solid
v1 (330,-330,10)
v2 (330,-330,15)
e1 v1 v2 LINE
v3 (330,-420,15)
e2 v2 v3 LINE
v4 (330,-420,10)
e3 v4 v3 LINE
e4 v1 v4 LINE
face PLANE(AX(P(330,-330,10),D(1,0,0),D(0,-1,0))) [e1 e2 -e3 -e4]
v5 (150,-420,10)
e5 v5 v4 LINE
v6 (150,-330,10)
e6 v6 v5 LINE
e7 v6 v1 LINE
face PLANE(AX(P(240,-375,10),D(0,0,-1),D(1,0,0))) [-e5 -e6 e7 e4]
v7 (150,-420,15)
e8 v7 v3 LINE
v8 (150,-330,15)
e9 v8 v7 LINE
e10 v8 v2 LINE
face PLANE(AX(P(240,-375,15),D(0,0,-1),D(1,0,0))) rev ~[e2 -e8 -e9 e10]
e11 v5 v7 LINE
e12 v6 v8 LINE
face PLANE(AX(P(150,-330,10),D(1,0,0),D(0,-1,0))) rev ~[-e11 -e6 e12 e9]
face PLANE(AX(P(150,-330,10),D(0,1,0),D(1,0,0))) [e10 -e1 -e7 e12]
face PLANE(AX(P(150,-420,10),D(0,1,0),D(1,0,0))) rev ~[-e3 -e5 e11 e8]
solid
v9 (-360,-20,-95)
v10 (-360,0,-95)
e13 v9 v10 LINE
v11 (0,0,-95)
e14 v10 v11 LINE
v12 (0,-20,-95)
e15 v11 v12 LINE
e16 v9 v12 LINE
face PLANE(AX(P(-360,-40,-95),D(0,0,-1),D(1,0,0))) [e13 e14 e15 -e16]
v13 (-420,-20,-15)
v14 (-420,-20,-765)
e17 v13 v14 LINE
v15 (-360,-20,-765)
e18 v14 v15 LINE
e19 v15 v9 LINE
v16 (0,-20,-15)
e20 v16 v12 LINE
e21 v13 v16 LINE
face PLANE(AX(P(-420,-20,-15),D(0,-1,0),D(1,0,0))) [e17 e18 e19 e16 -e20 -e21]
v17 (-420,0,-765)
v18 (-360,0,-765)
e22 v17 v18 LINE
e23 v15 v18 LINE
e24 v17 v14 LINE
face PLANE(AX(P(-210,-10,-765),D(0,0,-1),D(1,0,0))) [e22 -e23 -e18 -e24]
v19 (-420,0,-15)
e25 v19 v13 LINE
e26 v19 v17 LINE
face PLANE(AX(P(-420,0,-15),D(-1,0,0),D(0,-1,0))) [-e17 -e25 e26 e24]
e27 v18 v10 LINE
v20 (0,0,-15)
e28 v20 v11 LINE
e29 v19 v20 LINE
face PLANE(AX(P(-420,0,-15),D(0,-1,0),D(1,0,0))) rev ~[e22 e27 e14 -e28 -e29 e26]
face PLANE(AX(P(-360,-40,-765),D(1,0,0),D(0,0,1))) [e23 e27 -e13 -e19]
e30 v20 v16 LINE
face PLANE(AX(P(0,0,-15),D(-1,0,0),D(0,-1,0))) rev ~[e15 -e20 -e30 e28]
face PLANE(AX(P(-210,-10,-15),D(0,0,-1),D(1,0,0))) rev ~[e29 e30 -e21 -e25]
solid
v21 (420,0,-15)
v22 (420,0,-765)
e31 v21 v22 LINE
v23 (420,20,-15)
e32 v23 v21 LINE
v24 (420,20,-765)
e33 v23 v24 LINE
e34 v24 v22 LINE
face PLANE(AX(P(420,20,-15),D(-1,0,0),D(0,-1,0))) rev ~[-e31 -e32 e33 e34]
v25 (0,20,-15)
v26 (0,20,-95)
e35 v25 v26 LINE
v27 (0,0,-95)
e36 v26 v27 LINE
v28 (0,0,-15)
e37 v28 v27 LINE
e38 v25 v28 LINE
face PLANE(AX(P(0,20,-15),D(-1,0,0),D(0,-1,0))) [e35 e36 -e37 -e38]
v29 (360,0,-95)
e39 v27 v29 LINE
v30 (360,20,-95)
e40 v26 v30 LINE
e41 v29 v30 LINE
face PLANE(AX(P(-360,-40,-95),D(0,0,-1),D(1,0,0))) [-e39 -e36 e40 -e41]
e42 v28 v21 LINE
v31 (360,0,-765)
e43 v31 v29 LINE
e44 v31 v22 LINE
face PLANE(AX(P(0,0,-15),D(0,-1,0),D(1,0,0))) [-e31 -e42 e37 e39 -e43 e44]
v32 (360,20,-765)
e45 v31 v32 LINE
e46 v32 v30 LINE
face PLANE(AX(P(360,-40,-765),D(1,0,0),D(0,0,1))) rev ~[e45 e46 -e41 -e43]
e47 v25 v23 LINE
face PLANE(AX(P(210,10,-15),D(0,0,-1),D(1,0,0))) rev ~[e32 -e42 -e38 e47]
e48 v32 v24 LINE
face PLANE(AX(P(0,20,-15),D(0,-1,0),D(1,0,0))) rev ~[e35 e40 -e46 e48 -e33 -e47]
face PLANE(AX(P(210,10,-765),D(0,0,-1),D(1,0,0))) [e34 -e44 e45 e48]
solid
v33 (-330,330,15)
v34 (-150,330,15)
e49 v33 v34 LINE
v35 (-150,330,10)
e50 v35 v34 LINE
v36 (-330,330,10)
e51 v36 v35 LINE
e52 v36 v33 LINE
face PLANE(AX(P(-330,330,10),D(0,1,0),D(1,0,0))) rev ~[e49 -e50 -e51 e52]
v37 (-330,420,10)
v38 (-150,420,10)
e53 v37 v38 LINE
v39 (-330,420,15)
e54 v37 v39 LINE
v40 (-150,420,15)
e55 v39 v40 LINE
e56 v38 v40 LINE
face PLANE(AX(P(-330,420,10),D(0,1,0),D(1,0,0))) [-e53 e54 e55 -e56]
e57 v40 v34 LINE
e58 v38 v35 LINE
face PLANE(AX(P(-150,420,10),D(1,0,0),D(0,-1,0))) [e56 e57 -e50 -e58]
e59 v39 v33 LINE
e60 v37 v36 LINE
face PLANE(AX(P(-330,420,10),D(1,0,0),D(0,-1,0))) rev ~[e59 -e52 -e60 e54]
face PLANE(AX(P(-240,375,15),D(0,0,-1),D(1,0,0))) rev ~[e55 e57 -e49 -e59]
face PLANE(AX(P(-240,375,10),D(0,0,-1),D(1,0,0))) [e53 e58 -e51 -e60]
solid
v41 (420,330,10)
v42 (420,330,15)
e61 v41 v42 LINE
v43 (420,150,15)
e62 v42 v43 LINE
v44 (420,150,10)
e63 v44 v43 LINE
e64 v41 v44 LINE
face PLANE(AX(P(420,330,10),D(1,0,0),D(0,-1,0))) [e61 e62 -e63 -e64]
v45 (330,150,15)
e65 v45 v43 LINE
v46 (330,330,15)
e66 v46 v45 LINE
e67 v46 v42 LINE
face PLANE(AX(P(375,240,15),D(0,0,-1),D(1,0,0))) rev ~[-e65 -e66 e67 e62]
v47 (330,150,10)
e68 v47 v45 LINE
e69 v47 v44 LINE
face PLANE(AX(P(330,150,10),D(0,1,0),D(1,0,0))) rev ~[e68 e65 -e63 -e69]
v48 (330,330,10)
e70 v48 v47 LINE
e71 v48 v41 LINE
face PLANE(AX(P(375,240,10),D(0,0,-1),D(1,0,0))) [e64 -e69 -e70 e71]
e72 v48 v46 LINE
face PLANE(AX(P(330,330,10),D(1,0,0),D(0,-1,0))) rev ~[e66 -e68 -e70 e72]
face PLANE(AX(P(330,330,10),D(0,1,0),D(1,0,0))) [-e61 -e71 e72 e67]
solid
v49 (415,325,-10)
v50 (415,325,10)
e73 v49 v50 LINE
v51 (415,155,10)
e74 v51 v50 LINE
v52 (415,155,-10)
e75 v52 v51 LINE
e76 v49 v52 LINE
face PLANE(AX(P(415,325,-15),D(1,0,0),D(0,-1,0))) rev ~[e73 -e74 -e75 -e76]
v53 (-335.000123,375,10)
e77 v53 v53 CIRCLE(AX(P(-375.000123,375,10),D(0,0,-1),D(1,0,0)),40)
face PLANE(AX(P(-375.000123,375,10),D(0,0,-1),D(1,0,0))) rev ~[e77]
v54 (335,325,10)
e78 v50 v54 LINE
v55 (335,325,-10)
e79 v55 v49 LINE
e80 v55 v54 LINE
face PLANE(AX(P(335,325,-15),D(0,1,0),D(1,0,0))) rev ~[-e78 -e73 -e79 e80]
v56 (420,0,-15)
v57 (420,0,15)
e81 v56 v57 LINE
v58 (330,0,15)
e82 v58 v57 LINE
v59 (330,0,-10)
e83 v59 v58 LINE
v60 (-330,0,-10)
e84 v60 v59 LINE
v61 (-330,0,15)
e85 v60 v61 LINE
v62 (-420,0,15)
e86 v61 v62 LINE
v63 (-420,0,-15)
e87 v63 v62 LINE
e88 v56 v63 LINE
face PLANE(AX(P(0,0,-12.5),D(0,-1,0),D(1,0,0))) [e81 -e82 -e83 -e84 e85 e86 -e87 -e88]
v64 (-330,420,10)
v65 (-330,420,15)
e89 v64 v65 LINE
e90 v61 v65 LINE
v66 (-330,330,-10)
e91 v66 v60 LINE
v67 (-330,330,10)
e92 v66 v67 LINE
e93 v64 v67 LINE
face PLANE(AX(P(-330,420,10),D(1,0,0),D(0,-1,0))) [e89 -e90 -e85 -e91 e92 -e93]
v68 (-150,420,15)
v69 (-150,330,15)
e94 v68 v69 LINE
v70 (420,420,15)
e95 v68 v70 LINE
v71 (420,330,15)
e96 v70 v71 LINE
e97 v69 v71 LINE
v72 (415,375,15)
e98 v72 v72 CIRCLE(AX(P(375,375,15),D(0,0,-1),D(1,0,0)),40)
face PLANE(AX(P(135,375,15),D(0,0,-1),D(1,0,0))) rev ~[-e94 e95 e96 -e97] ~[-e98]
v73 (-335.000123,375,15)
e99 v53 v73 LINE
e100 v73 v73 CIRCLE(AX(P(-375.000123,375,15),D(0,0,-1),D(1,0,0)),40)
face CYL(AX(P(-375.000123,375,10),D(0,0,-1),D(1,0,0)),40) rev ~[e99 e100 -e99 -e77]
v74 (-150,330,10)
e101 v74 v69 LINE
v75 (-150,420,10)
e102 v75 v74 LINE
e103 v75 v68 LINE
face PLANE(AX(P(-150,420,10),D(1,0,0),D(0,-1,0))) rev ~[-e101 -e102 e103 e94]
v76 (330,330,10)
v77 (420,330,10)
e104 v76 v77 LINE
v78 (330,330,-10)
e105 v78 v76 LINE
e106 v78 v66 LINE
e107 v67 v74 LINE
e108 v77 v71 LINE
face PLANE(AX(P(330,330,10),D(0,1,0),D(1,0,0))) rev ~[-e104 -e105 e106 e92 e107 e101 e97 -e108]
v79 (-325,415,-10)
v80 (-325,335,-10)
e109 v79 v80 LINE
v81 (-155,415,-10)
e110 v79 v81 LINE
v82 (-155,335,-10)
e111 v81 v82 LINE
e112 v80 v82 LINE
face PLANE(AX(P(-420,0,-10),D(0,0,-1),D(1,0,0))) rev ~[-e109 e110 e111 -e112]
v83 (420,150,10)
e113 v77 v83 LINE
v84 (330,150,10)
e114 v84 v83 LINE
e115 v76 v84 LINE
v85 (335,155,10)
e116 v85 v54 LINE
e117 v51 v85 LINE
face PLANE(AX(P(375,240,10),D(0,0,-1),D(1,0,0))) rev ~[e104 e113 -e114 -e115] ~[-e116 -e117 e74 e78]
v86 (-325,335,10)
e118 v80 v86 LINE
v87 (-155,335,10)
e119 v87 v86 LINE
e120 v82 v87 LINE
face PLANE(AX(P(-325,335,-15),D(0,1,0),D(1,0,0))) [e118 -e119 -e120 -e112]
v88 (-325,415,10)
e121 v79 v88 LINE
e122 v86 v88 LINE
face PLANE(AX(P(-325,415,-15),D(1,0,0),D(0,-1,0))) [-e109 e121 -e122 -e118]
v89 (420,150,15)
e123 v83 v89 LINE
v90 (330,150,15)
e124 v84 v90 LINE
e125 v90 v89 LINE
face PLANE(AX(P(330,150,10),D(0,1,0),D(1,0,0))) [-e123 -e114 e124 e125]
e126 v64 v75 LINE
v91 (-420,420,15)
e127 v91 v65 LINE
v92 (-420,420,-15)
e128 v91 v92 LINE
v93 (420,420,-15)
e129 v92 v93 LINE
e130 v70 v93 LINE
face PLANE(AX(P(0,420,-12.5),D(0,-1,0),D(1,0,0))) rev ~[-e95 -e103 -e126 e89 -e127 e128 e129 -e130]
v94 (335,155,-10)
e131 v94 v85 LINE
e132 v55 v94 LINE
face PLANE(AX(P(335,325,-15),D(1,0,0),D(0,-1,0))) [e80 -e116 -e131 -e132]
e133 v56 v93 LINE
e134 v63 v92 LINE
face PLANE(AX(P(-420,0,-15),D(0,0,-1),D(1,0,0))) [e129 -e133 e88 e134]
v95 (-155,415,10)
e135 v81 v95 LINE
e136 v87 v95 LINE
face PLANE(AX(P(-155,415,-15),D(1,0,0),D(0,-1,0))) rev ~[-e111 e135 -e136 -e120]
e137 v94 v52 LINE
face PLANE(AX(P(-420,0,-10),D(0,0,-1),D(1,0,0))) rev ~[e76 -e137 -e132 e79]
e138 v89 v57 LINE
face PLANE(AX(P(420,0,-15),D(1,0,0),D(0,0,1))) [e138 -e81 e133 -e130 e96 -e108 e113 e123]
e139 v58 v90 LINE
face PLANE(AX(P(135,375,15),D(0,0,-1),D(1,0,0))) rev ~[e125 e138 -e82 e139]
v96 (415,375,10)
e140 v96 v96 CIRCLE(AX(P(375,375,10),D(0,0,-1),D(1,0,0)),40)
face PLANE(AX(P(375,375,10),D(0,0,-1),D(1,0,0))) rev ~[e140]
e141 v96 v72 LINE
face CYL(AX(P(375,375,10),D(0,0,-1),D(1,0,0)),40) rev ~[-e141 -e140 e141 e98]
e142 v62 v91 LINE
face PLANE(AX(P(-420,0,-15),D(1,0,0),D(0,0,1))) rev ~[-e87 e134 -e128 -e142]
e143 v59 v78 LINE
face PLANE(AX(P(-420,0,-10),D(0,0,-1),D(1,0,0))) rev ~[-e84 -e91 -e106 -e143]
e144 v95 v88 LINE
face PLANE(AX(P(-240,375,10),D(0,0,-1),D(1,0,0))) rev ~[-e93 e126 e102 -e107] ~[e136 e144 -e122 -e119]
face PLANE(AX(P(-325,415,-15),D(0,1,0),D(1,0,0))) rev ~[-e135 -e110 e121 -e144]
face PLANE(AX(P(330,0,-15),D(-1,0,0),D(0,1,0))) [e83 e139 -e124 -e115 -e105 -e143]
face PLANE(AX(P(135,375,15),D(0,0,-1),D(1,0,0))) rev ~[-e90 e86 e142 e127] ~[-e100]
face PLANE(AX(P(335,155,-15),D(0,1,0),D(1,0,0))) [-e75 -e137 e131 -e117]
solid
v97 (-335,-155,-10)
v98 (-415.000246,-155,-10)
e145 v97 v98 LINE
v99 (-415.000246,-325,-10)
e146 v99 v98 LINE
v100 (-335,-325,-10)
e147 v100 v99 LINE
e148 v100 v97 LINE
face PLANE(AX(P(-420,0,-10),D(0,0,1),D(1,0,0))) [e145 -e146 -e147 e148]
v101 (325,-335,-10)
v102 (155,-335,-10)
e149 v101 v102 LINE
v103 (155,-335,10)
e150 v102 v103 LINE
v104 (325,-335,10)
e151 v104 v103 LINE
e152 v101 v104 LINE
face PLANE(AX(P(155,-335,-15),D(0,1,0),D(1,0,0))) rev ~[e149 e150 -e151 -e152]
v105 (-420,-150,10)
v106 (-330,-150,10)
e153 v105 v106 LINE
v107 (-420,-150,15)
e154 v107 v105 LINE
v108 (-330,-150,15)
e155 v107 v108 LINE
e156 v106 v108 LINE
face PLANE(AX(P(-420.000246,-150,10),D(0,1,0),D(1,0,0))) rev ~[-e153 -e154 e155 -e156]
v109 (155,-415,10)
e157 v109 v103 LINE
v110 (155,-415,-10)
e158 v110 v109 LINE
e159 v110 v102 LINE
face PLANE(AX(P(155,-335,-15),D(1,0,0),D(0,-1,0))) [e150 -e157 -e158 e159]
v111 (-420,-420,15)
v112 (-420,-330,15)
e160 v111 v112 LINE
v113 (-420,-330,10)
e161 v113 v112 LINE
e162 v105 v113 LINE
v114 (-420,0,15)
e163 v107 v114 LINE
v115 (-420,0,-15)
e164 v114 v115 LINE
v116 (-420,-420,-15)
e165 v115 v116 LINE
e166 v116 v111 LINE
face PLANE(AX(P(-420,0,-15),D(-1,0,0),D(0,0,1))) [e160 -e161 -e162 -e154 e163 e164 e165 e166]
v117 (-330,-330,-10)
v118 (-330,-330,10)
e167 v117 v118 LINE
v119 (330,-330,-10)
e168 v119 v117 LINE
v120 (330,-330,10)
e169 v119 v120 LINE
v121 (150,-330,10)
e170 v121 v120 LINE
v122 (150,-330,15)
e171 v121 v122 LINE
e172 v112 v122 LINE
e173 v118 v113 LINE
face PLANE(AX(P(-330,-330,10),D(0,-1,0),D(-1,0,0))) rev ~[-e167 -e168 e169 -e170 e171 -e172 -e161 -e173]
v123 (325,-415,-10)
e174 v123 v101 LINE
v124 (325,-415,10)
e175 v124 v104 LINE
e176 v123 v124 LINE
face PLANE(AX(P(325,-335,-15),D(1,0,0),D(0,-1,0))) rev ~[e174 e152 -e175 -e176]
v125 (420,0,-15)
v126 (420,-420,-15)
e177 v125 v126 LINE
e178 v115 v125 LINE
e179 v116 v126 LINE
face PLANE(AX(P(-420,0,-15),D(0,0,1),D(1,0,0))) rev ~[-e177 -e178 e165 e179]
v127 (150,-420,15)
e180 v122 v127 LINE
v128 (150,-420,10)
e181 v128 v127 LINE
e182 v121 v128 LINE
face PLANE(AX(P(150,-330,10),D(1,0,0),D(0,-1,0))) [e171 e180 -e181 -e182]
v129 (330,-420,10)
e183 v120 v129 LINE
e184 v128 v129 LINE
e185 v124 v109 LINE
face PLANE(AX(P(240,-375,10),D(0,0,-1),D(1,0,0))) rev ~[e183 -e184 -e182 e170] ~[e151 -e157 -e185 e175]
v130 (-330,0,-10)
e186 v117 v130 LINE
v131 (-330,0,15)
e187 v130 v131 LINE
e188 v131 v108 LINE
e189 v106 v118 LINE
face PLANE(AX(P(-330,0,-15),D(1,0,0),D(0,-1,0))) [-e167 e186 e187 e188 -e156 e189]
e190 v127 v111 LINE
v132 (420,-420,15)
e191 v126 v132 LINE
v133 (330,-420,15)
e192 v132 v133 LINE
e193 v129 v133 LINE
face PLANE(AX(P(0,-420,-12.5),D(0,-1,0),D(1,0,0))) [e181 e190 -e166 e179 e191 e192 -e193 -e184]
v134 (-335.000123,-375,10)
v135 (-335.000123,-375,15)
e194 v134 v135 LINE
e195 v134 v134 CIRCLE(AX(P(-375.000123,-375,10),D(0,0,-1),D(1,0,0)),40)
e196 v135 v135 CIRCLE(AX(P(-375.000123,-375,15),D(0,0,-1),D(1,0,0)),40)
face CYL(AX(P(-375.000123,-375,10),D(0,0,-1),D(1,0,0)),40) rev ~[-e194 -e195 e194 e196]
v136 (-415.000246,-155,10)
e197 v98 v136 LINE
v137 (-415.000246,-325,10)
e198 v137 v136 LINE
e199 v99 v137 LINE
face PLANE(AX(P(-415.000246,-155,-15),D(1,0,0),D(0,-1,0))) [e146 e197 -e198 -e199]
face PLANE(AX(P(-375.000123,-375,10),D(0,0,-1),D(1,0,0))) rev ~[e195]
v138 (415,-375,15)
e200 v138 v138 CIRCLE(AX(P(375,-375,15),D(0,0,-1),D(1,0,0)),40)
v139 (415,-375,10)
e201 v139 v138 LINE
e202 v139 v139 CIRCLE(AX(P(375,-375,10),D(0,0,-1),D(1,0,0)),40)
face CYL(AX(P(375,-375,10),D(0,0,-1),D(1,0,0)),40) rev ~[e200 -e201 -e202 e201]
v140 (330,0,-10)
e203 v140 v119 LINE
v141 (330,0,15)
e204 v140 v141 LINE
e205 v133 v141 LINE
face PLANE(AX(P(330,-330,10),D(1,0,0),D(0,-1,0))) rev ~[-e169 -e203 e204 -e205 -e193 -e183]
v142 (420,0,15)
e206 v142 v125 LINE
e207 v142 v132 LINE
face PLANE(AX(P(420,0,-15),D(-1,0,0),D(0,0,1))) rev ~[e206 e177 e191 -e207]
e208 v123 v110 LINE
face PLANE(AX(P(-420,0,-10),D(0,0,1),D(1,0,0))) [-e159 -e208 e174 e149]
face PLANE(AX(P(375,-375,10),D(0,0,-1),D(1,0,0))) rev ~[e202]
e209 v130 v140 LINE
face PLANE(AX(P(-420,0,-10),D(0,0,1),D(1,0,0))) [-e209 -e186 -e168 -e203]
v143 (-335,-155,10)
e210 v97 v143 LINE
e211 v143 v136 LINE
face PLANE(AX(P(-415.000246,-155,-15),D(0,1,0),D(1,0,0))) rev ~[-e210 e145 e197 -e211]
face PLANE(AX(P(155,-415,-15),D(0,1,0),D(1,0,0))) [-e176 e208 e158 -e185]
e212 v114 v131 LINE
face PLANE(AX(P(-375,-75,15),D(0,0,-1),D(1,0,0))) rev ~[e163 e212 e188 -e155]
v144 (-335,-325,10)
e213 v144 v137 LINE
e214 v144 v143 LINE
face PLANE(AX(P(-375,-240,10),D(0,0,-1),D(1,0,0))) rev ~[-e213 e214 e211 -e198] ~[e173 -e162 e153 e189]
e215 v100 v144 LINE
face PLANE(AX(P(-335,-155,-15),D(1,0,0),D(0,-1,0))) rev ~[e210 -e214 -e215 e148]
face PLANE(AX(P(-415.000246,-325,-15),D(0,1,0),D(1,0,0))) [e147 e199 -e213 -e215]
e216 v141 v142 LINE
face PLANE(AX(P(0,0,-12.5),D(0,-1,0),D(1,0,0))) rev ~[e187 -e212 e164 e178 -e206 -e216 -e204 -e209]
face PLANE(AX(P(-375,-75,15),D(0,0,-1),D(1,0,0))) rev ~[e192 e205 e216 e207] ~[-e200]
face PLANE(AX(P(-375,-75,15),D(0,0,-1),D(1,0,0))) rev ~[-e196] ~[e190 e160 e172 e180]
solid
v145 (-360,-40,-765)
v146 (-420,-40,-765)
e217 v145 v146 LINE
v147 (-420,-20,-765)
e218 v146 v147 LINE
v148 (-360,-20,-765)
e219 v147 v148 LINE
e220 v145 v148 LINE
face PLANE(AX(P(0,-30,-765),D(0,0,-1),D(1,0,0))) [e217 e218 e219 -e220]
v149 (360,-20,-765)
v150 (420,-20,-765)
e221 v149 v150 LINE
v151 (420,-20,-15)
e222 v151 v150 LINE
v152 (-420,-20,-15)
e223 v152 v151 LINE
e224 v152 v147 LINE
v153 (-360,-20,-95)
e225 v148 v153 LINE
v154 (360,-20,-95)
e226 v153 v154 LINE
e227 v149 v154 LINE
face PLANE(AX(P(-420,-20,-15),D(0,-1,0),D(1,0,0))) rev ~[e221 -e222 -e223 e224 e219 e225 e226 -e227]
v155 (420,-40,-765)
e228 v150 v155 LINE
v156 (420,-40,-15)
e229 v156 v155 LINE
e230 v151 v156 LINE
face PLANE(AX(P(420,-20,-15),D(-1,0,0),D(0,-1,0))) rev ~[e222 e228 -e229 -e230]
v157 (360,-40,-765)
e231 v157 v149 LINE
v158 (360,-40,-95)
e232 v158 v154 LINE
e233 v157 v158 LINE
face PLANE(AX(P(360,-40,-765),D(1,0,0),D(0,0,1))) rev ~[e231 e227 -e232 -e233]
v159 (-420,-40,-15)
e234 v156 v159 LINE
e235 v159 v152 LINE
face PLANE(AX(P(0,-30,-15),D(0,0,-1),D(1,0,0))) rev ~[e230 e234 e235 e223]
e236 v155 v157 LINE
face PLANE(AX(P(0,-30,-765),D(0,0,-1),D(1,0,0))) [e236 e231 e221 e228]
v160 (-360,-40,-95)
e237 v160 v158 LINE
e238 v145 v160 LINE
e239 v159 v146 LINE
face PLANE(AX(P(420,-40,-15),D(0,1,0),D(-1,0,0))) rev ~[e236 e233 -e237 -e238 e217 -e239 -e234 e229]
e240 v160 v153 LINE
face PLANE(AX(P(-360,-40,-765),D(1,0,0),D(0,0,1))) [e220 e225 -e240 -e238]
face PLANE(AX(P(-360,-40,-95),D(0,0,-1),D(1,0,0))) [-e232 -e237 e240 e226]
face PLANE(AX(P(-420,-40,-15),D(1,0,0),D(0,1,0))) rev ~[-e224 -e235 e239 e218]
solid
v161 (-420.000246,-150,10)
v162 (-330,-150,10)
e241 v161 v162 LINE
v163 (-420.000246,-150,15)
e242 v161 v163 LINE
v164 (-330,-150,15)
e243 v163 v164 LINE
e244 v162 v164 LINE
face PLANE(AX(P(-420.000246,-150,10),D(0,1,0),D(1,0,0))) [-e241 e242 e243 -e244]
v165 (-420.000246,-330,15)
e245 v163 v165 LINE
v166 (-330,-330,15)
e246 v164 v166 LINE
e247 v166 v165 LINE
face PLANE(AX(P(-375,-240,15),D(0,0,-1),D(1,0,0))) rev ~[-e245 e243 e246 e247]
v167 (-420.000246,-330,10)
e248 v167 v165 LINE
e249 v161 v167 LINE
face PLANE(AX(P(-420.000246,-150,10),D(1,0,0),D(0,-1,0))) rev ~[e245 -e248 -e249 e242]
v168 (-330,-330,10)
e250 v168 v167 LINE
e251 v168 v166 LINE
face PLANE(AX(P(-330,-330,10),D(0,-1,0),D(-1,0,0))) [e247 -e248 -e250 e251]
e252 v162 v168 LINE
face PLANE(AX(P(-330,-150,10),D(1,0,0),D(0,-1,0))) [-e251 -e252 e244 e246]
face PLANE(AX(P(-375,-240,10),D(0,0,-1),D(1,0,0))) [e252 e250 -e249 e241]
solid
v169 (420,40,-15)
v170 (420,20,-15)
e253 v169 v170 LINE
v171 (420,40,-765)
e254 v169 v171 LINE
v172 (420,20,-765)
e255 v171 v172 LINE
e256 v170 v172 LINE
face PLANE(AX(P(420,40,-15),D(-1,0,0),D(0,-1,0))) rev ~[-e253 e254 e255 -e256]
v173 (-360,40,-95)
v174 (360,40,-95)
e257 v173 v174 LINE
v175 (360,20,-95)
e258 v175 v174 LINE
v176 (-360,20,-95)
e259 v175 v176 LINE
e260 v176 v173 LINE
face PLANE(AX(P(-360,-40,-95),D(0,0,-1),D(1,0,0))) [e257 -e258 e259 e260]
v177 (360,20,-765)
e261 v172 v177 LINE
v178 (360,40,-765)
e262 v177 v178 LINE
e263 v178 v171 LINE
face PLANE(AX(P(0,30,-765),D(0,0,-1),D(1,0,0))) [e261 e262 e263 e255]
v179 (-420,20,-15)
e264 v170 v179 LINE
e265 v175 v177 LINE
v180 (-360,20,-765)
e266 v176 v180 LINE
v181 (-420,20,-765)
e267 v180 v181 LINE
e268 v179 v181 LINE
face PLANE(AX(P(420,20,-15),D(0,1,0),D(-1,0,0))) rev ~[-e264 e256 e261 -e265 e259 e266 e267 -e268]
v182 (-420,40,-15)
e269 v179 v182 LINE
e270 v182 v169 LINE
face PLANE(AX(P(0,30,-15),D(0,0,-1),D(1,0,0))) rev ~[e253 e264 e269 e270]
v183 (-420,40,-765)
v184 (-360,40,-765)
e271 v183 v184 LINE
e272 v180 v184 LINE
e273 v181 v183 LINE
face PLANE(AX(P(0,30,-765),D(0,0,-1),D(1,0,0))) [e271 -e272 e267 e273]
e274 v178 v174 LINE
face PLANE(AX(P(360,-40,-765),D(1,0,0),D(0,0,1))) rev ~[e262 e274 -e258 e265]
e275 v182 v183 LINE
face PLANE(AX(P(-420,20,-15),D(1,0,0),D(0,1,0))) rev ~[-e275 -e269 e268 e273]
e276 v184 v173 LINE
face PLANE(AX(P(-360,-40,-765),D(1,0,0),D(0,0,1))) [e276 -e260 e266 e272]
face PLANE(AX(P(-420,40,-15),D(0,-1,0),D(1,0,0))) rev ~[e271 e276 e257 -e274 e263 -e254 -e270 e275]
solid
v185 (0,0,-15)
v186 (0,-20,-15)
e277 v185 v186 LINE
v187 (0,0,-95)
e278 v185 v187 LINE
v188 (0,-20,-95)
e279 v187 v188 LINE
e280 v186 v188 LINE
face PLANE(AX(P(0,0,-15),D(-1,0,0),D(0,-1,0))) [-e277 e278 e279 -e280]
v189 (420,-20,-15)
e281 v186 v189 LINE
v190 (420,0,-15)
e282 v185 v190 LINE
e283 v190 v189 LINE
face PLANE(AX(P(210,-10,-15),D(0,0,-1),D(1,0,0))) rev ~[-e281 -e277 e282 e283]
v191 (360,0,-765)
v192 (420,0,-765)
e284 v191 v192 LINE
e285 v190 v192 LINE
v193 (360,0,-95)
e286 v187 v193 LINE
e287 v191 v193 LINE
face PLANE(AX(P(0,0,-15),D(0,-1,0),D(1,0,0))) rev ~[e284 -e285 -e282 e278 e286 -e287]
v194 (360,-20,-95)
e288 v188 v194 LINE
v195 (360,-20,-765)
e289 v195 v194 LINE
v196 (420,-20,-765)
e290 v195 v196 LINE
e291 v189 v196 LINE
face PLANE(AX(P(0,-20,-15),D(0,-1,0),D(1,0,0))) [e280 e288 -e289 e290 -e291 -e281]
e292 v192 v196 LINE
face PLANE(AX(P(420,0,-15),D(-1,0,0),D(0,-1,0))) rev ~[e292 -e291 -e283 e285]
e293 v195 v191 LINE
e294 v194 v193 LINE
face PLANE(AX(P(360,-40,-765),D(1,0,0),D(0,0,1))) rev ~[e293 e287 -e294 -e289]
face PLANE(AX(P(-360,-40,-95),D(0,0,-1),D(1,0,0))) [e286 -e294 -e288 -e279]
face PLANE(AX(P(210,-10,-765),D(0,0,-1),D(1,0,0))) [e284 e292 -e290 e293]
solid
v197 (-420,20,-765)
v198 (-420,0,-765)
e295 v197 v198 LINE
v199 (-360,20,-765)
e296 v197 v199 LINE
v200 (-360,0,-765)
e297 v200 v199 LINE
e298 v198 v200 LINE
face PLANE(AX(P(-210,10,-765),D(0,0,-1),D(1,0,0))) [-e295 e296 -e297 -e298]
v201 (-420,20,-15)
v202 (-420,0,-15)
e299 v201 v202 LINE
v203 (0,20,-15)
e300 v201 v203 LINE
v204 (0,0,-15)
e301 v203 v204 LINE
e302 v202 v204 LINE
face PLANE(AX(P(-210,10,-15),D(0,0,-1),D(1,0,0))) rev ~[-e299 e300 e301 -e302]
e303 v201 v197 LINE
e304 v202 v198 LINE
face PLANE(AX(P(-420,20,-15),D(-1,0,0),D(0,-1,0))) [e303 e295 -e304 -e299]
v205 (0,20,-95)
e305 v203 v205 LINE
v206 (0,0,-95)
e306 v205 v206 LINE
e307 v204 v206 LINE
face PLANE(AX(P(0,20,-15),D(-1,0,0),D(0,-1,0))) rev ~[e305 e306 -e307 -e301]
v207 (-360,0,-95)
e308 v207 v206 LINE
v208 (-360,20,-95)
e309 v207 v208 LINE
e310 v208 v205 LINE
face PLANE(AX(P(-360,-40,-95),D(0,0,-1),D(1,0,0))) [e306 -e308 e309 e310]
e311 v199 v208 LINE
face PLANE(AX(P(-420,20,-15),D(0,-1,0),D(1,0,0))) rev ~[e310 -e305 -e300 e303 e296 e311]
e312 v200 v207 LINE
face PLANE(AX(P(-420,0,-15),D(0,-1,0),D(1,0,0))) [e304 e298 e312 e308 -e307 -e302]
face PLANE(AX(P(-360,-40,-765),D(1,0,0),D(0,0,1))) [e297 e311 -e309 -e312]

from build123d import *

# Parameters (mm, degrees)
F0_W      = 840
F0_H      = 5
F1_DEPTH  = 420
F2_DEPTH  = 420
F3_R      = 40
F3_W      = 90
F3_H      = 150
F3_H_2    = 180
F3_W_2    = 80
F3_H_3    = 170
F3_W_3    = 180
F3_H_4    = 90
F3_W_4    = 170
F3_H_5    = 80
F4_DEPTH  = 30
F3_W_5    = 80.0002463284
F5_DEPTH  = 30
F3_W_6    = 0.0002463284
F6_DEPTH  = 5
F11_DEPTH = 750
F10_W     = 420
F10_H     = 20
F12_DEPTH = 750
F13_DEPTH = 750
F14_W     = 720
F14_H     = 670
F15_DEPTH = 201


with BuildPart() as f1:
    # F0 (on Front) → F1 (new body)
    with BuildSketch(Plane.XZ):
        with Locations((0, -12.5)):
            Rectangle(F0_W, F0_H)
    extrude(amount=F1_DEPTH)

    # F3 (on face) → F5 (join)
    with BuildSketch(Plane(origin=(0, 0, -15), x_dir=(1, 0, 0), z_dir=(0, 0, -1))):
        with Locations((-375, 75)):
            Rectangle(F3_W, F3_H)
        Polygon((-330, 330), (150, 330), (150, 420), (-420, 420), (-420, 330), align=None)
        with Locations((-375.0001231642, 375)):
            Circle(F3_R, mode=Mode.SUBTRACT)
        Polygon((330, 330), (330, 0), (420, 0), (420, 420), (330, 420), align=None)
        with Locations((375, 375)):
            Circle(F3_R, mode=Mode.SUBTRACT)
        with Locations((-375.0001231642, 375)):
            Circle(F3_R)
        with Locations((375, 375)):
            Circle(F3_R)
        with Locations((-375, 240)):
            Rectangle(F3_W, F3_H_2)
        with Locations((-375.0001231642, 240)):
            Rectangle(F3_W_5, F3_H_3, mode=Mode.SUBTRACT)
        with Locations((240, 375)):
            Rectangle(F3_W_3, F3_H_4)
        with Locations((240, 375)):
            Rectangle(F3_W_4, F3_H_5, mode=Mode.SUBTRACT)
    extrude(amount=-F5_DEPTH)


with BuildPart() as f2:
    # F0 (on Front) → F2 (new body)
    with BuildSketch(Plane.XZ):
        with Locations((0, -12.5)):
            Rectangle(F0_W, F0_H)
    extrude(amount=-F2_DEPTH)

    # F3 (on face) → F4 (join)
    with BuildSketch(Plane(origin=(0, 0, -15), x_dir=(1, 0, 0), z_dir=(0, 0, -1))):
        Polygon((420, -330), (330, -330), (-150, -330), (-150, -420), (420, -420), align=None)
        with Locations((375, -375)):
            Circle(F3_R, mode=Mode.SUBTRACT)
        Polygon((-330, -420), (-330, -330), (-330, 0), (-420, 0), (-420, -420), align=None)
        with Locations((-375.0001231642, -375)):
            Circle(F3_R, mode=Mode.SUBTRACT)
        with Locations((375, -75)):
            Rectangle(F3_W, F3_H)
        with Locations((375, -240)):
            Rectangle(F3_W, F3_H_2)
        with Locations((375, -240)):
            Rectangle(F3_W_2, F3_H_3, mode=Mode.SUBTRACT)
        with Locations((-240, -375)):
            Rectangle(F3_W_3, F3_H_4)
        with Locations((-240, -375)):
            Rectangle(F3_W_4, F3_H_5, mode=Mode.SUBTRACT)
        with Locations((-375.0001231642, -375)):
            Circle(F3_R)
        with Locations((375, -375)):
            Circle(F3_R)
    extrude(amount=-F4_DEPTH)


with BuildPart() as f6:
    # F3 (on face) → F6 (new body)
    with BuildSketch(Plane(origin=(0, 0, -15), x_dir=(1, 0, 0), z_dir=(0, 0, -1))):
        with Locations((-375, 240)):
            Rectangle(F3_W, F3_H_2)
        with Locations((-375.0001231642, 240)):
            Rectangle(F3_W_5, F3_H_3, mode=Mode.SUBTRACT)
        with Locations((-375.0001231642, 240)):
            Rectangle(F3_W_5, F3_H_3)
        with Locations((-420.0001231642, 240)):
            Rectangle(F3_W_6, F3_H_2)
    extrude(amount=-F6_DEPTH)


with BuildPart() as f6b:
    # F3 (on face) → F6, piece 2 (new body)
    with BuildSketch(Plane(origin=(0, 0, -15), x_dir=(1, 0, 0), z_dir=(0, 0, -1))):
        with Locations((240, 375)):
            Rectangle(F3_W_3, F3_H_4)
        with Locations((240, 375)):
            Rectangle(F3_W_4, F3_H_5, mode=Mode.SUBTRACT)
        with Locations((240, 375)):
            Rectangle(F3_W_4, F3_H_5)
    extrude(amount=-F6_DEPTH)


with BuildPart() as f6c:
    # F3 (on face) → F6, piece 3 (new body)
    with BuildSketch(Plane(origin=(0, 0, -15), x_dir=(1, 0, 0), z_dir=(0, 0, -1))):
        with Locations((375, -240)):
            Rectangle(F3_W, F3_H_2)
        with Locations((375, -240)):
            Rectangle(F3_W_2, F3_H_3, mode=Mode.SUBTRACT)
        with Locations((375, -240)):
            Rectangle(F3_W_2, F3_H_3)
    extrude(amount=-F6_DEPTH)


with BuildPart() as f6d:
    # F3 (on face) → F6, piece 4 (new body)
    with BuildSketch(Plane(origin=(0, 0, -15), x_dir=(1, 0, 0), z_dir=(0, 0, -1))):
        with Locations((-240, -375)):
            Rectangle(F3_W_3, F3_H_4)
        with Locations((-240, -375)):
            Rectangle(F3_W_4, F3_H_5, mode=Mode.SUBTRACT)
        with Locations((-240, -375)):
            Rectangle(F3_W_4, F3_H_5)
    extrude(amount=-F6_DEPTH)


with BuildPart() as f6e:
    # F3 (on face) → F6, piece 5 (new body)
    with BuildSketch(Plane(origin=(0, 0, -15), x_dir=(1, 0, 0), z_dir=(0, 0, -1))):
        with Locations((-375.0001231642, 375)):
            Circle(F3_R)
    extrude(amount=-F6_DEPTH)


with BuildPart() as f6f:
    # F3 (on face) → F6, piece 6 (new body)
    with BuildSketch(Plane(origin=(0, 0, -15), x_dir=(1, 0, 0), z_dir=(0, 0, -1))):
        with Locations((-375.0001231642, -375)):
            Circle(F3_R)
    extrude(amount=-F6_DEPTH)


with BuildPart() as f6g:
    # F3 (on face) → F6, piece 7 (new body)
    with BuildSketch(Plane(origin=(0, 0, -15), x_dir=(1, 0, 0), z_dir=(0, 0, -1))):
        with Locations((375, -375)):
            Circle(F3_R)
    extrude(amount=-F6_DEPTH)


with BuildPart() as f6h:
    # F3 (on face) → F6, piece 8 (new body)
    with BuildSketch(Plane(origin=(0, 0, -15), x_dir=(1, 0, 0), z_dir=(0, 0, -1))):
        with Locations((375, 375)):
            Circle(F3_R)
    extrude(amount=-F6_DEPTH)


with BuildPart() as f6d_1:
    # F7: moved
    add(f6d.part.moved(Location((0, 0, 25))))


with BuildPart() as f6_1:
    # F7: moved
    add(f6.part.moved(Location((0, 0, 25))))


with BuildPart() as f6c_1:
    # F7: moved
    add(f6c.part.moved(Location((0, 0, 25))))


with BuildPart() as f6b_1:
    # F7: moved
    add(f6b.part.moved(Location((0, 0, 25))))


with BuildPart() as f6f_1:
    # F7: moved
    add(f6f.part.moved(Location((0, 0, 25))))


with BuildPart() as f6e_1:
    # F7: moved
    add(f6e.part.moved(Location((0, 0, 25))))


with BuildPart() as f6h_1:
    # F7: moved
    add(f6h.part.moved(Location((0, 0, 25))))


with BuildPart() as f6g_1:
    # F7: moved
    add(f6g.part.moved(Location((0, 0, 25))))


with BuildPart() as f2_1:
    add(f2.part)

    # F8: cut F6d, F6c, F6b, F6
    add(f6d_1.part, mode=Mode.SUBTRACT)
    add(f6c_1.part, mode=Mode.SUBTRACT)
    add(f6b_1.part, mode=Mode.SUBTRACT)
    add(f6_1.part, mode=Mode.SUBTRACT)

    # F9: cut F6g, F6f, F6e, F6h
    add(f6g_1.part, mode=Mode.SUBTRACT)
    add(f6f_1.part, mode=Mode.SUBTRACT)
    add(f6e_1.part, mode=Mode.SUBTRACT)
    add(f6h_1.part, mode=Mode.SUBTRACT)


with BuildPart() as f1_1:
    add(f1.part)

    # F8: cut F6d, F6c, F6b, F6
    add(f6d_1.part, mode=Mode.SUBTRACT)
    add(f6c_1.part, mode=Mode.SUBTRACT)
    add(f6b_1.part, mode=Mode.SUBTRACT)
    add(f6_1.part, mode=Mode.SUBTRACT)

    # F9: cut F6g, F6f, F6e, F6h
    add(f6g_1.part, mode=Mode.SUBTRACT)
    add(f6f_1.part, mode=Mode.SUBTRACT)
    add(f6e_1.part, mode=Mode.SUBTRACT)
    add(f6h_1.part, mode=Mode.SUBTRACT)


with BuildPart() as f11:
    # F10 (on face) → F11 (new body)
    with BuildSketch(Plane(origin=(0, 0, -15), x_dir=(1, 0, 0), z_dir=(0, 0, -1))):
        Polygon((-420, 40), (-420, 20), (0, 20), (420, 20), (420, 40), align=None)
    extrude(amount=F11_DEPTH)


with BuildPart() as f11b:
    # F10 (on face) → F11, piece 2 (new body)
    with BuildSketch(Plane(origin=(0, 0, -15), x_dir=(1, 0, 0), z_dir=(0, 0, -1))):
        Polygon((0, -20), (-420, -20), (-420, -40), (420, -40), (420, -20), align=None)
    extrude(amount=F11_DEPTH)


with BuildPart() as f12:
    # F10 (on face) → F12 (new body, through all)
    with BuildSketch(Plane(origin=(0, 0, -15), x_dir=(1, 0, 0), z_dir=(0, 0, -1))):
        with Locations((-210, 10)):
            Rectangle(F10_W, F10_H)
    extrude(amount=F12_DEPTH)


with BuildPart() as f12b:
    # F10 (on face) → F12, piece 2 (new body, through all)
    with BuildSketch(Plane(origin=(0, 0, -15), x_dir=(1, 0, 0), z_dir=(0, 0, -1))):
        with Locations((210, -10)):
            Rectangle(F10_W, F10_H)
    extrude(amount=F12_DEPTH)


with BuildPart() as f13:
    # F10 (on face) → F13 (new body, through all)
    with BuildSketch(Plane(origin=(0, 0, -15), x_dir=(1, 0, 0), z_dir=(0, 0, -1))):
        with Locations((210, 10)):
            Rectangle(F10_W, F10_H)
    extrude(amount=F13_DEPTH)


with BuildPart() as f13b:
    # F10 (on face) → F13, piece 2 (new body, through all)
    with BuildSketch(Plane(origin=(0, 0, -15), x_dir=(1, 0, 0), z_dir=(0, 0, -1))):
        with Locations((-210, -10)):
            Rectangle(F10_W, F10_H)
    extrude(amount=F13_DEPTH)


with BuildPart() as f15_tool:
    # F14 (on face) → F15 (new body)
    with BuildSketch(Plane.XZ.offset(40)):
        with Locations((0, -430)):
            Rectangle(F14_W, F14_H)
    extrude(amount=-F15_DEPTH)


with BuildPart() as f11_1:
    add(f11.part)

    # F15: cut by f15_tool
    add(f15_tool.part, mode=Mode.SUBTRACT)


with BuildPart() as f11b_1:
    add(f11b.part)

    # F15: cut by f15_tool
    add(f15_tool.part, mode=Mode.SUBTRACT)


with BuildPart() as f12_1:
    add(f12.part)

    # F15: cut by f15_tool
    add(f15_tool.part, mode=Mode.SUBTRACT)


with BuildPart() as f12b_1:
    add(f12b.part)

    # F15: cut by f15_tool
    add(f15_tool.part, mode=Mode.SUBTRACT)


with BuildPart() as f13_1:
    add(f13.part)

    # F15: cut by f15_tool
    add(f15_tool.part, mode=Mode.SUBTRACT)


with BuildPart() as f13b_1:
    add(f13b.part)

    # F15: cut by f15_tool
    add(f15_tool.part, mode=Mode.SUBTRACT)


solid = Compound([f6d_1.part, f6_1.part, f6c_1.part, f6b_1.part, f2_1.part, f1_1.part, f11_1.part, f11b_1.part, f12_1.part, f12b_1.part, f13_1.part, f13b_1.part])
